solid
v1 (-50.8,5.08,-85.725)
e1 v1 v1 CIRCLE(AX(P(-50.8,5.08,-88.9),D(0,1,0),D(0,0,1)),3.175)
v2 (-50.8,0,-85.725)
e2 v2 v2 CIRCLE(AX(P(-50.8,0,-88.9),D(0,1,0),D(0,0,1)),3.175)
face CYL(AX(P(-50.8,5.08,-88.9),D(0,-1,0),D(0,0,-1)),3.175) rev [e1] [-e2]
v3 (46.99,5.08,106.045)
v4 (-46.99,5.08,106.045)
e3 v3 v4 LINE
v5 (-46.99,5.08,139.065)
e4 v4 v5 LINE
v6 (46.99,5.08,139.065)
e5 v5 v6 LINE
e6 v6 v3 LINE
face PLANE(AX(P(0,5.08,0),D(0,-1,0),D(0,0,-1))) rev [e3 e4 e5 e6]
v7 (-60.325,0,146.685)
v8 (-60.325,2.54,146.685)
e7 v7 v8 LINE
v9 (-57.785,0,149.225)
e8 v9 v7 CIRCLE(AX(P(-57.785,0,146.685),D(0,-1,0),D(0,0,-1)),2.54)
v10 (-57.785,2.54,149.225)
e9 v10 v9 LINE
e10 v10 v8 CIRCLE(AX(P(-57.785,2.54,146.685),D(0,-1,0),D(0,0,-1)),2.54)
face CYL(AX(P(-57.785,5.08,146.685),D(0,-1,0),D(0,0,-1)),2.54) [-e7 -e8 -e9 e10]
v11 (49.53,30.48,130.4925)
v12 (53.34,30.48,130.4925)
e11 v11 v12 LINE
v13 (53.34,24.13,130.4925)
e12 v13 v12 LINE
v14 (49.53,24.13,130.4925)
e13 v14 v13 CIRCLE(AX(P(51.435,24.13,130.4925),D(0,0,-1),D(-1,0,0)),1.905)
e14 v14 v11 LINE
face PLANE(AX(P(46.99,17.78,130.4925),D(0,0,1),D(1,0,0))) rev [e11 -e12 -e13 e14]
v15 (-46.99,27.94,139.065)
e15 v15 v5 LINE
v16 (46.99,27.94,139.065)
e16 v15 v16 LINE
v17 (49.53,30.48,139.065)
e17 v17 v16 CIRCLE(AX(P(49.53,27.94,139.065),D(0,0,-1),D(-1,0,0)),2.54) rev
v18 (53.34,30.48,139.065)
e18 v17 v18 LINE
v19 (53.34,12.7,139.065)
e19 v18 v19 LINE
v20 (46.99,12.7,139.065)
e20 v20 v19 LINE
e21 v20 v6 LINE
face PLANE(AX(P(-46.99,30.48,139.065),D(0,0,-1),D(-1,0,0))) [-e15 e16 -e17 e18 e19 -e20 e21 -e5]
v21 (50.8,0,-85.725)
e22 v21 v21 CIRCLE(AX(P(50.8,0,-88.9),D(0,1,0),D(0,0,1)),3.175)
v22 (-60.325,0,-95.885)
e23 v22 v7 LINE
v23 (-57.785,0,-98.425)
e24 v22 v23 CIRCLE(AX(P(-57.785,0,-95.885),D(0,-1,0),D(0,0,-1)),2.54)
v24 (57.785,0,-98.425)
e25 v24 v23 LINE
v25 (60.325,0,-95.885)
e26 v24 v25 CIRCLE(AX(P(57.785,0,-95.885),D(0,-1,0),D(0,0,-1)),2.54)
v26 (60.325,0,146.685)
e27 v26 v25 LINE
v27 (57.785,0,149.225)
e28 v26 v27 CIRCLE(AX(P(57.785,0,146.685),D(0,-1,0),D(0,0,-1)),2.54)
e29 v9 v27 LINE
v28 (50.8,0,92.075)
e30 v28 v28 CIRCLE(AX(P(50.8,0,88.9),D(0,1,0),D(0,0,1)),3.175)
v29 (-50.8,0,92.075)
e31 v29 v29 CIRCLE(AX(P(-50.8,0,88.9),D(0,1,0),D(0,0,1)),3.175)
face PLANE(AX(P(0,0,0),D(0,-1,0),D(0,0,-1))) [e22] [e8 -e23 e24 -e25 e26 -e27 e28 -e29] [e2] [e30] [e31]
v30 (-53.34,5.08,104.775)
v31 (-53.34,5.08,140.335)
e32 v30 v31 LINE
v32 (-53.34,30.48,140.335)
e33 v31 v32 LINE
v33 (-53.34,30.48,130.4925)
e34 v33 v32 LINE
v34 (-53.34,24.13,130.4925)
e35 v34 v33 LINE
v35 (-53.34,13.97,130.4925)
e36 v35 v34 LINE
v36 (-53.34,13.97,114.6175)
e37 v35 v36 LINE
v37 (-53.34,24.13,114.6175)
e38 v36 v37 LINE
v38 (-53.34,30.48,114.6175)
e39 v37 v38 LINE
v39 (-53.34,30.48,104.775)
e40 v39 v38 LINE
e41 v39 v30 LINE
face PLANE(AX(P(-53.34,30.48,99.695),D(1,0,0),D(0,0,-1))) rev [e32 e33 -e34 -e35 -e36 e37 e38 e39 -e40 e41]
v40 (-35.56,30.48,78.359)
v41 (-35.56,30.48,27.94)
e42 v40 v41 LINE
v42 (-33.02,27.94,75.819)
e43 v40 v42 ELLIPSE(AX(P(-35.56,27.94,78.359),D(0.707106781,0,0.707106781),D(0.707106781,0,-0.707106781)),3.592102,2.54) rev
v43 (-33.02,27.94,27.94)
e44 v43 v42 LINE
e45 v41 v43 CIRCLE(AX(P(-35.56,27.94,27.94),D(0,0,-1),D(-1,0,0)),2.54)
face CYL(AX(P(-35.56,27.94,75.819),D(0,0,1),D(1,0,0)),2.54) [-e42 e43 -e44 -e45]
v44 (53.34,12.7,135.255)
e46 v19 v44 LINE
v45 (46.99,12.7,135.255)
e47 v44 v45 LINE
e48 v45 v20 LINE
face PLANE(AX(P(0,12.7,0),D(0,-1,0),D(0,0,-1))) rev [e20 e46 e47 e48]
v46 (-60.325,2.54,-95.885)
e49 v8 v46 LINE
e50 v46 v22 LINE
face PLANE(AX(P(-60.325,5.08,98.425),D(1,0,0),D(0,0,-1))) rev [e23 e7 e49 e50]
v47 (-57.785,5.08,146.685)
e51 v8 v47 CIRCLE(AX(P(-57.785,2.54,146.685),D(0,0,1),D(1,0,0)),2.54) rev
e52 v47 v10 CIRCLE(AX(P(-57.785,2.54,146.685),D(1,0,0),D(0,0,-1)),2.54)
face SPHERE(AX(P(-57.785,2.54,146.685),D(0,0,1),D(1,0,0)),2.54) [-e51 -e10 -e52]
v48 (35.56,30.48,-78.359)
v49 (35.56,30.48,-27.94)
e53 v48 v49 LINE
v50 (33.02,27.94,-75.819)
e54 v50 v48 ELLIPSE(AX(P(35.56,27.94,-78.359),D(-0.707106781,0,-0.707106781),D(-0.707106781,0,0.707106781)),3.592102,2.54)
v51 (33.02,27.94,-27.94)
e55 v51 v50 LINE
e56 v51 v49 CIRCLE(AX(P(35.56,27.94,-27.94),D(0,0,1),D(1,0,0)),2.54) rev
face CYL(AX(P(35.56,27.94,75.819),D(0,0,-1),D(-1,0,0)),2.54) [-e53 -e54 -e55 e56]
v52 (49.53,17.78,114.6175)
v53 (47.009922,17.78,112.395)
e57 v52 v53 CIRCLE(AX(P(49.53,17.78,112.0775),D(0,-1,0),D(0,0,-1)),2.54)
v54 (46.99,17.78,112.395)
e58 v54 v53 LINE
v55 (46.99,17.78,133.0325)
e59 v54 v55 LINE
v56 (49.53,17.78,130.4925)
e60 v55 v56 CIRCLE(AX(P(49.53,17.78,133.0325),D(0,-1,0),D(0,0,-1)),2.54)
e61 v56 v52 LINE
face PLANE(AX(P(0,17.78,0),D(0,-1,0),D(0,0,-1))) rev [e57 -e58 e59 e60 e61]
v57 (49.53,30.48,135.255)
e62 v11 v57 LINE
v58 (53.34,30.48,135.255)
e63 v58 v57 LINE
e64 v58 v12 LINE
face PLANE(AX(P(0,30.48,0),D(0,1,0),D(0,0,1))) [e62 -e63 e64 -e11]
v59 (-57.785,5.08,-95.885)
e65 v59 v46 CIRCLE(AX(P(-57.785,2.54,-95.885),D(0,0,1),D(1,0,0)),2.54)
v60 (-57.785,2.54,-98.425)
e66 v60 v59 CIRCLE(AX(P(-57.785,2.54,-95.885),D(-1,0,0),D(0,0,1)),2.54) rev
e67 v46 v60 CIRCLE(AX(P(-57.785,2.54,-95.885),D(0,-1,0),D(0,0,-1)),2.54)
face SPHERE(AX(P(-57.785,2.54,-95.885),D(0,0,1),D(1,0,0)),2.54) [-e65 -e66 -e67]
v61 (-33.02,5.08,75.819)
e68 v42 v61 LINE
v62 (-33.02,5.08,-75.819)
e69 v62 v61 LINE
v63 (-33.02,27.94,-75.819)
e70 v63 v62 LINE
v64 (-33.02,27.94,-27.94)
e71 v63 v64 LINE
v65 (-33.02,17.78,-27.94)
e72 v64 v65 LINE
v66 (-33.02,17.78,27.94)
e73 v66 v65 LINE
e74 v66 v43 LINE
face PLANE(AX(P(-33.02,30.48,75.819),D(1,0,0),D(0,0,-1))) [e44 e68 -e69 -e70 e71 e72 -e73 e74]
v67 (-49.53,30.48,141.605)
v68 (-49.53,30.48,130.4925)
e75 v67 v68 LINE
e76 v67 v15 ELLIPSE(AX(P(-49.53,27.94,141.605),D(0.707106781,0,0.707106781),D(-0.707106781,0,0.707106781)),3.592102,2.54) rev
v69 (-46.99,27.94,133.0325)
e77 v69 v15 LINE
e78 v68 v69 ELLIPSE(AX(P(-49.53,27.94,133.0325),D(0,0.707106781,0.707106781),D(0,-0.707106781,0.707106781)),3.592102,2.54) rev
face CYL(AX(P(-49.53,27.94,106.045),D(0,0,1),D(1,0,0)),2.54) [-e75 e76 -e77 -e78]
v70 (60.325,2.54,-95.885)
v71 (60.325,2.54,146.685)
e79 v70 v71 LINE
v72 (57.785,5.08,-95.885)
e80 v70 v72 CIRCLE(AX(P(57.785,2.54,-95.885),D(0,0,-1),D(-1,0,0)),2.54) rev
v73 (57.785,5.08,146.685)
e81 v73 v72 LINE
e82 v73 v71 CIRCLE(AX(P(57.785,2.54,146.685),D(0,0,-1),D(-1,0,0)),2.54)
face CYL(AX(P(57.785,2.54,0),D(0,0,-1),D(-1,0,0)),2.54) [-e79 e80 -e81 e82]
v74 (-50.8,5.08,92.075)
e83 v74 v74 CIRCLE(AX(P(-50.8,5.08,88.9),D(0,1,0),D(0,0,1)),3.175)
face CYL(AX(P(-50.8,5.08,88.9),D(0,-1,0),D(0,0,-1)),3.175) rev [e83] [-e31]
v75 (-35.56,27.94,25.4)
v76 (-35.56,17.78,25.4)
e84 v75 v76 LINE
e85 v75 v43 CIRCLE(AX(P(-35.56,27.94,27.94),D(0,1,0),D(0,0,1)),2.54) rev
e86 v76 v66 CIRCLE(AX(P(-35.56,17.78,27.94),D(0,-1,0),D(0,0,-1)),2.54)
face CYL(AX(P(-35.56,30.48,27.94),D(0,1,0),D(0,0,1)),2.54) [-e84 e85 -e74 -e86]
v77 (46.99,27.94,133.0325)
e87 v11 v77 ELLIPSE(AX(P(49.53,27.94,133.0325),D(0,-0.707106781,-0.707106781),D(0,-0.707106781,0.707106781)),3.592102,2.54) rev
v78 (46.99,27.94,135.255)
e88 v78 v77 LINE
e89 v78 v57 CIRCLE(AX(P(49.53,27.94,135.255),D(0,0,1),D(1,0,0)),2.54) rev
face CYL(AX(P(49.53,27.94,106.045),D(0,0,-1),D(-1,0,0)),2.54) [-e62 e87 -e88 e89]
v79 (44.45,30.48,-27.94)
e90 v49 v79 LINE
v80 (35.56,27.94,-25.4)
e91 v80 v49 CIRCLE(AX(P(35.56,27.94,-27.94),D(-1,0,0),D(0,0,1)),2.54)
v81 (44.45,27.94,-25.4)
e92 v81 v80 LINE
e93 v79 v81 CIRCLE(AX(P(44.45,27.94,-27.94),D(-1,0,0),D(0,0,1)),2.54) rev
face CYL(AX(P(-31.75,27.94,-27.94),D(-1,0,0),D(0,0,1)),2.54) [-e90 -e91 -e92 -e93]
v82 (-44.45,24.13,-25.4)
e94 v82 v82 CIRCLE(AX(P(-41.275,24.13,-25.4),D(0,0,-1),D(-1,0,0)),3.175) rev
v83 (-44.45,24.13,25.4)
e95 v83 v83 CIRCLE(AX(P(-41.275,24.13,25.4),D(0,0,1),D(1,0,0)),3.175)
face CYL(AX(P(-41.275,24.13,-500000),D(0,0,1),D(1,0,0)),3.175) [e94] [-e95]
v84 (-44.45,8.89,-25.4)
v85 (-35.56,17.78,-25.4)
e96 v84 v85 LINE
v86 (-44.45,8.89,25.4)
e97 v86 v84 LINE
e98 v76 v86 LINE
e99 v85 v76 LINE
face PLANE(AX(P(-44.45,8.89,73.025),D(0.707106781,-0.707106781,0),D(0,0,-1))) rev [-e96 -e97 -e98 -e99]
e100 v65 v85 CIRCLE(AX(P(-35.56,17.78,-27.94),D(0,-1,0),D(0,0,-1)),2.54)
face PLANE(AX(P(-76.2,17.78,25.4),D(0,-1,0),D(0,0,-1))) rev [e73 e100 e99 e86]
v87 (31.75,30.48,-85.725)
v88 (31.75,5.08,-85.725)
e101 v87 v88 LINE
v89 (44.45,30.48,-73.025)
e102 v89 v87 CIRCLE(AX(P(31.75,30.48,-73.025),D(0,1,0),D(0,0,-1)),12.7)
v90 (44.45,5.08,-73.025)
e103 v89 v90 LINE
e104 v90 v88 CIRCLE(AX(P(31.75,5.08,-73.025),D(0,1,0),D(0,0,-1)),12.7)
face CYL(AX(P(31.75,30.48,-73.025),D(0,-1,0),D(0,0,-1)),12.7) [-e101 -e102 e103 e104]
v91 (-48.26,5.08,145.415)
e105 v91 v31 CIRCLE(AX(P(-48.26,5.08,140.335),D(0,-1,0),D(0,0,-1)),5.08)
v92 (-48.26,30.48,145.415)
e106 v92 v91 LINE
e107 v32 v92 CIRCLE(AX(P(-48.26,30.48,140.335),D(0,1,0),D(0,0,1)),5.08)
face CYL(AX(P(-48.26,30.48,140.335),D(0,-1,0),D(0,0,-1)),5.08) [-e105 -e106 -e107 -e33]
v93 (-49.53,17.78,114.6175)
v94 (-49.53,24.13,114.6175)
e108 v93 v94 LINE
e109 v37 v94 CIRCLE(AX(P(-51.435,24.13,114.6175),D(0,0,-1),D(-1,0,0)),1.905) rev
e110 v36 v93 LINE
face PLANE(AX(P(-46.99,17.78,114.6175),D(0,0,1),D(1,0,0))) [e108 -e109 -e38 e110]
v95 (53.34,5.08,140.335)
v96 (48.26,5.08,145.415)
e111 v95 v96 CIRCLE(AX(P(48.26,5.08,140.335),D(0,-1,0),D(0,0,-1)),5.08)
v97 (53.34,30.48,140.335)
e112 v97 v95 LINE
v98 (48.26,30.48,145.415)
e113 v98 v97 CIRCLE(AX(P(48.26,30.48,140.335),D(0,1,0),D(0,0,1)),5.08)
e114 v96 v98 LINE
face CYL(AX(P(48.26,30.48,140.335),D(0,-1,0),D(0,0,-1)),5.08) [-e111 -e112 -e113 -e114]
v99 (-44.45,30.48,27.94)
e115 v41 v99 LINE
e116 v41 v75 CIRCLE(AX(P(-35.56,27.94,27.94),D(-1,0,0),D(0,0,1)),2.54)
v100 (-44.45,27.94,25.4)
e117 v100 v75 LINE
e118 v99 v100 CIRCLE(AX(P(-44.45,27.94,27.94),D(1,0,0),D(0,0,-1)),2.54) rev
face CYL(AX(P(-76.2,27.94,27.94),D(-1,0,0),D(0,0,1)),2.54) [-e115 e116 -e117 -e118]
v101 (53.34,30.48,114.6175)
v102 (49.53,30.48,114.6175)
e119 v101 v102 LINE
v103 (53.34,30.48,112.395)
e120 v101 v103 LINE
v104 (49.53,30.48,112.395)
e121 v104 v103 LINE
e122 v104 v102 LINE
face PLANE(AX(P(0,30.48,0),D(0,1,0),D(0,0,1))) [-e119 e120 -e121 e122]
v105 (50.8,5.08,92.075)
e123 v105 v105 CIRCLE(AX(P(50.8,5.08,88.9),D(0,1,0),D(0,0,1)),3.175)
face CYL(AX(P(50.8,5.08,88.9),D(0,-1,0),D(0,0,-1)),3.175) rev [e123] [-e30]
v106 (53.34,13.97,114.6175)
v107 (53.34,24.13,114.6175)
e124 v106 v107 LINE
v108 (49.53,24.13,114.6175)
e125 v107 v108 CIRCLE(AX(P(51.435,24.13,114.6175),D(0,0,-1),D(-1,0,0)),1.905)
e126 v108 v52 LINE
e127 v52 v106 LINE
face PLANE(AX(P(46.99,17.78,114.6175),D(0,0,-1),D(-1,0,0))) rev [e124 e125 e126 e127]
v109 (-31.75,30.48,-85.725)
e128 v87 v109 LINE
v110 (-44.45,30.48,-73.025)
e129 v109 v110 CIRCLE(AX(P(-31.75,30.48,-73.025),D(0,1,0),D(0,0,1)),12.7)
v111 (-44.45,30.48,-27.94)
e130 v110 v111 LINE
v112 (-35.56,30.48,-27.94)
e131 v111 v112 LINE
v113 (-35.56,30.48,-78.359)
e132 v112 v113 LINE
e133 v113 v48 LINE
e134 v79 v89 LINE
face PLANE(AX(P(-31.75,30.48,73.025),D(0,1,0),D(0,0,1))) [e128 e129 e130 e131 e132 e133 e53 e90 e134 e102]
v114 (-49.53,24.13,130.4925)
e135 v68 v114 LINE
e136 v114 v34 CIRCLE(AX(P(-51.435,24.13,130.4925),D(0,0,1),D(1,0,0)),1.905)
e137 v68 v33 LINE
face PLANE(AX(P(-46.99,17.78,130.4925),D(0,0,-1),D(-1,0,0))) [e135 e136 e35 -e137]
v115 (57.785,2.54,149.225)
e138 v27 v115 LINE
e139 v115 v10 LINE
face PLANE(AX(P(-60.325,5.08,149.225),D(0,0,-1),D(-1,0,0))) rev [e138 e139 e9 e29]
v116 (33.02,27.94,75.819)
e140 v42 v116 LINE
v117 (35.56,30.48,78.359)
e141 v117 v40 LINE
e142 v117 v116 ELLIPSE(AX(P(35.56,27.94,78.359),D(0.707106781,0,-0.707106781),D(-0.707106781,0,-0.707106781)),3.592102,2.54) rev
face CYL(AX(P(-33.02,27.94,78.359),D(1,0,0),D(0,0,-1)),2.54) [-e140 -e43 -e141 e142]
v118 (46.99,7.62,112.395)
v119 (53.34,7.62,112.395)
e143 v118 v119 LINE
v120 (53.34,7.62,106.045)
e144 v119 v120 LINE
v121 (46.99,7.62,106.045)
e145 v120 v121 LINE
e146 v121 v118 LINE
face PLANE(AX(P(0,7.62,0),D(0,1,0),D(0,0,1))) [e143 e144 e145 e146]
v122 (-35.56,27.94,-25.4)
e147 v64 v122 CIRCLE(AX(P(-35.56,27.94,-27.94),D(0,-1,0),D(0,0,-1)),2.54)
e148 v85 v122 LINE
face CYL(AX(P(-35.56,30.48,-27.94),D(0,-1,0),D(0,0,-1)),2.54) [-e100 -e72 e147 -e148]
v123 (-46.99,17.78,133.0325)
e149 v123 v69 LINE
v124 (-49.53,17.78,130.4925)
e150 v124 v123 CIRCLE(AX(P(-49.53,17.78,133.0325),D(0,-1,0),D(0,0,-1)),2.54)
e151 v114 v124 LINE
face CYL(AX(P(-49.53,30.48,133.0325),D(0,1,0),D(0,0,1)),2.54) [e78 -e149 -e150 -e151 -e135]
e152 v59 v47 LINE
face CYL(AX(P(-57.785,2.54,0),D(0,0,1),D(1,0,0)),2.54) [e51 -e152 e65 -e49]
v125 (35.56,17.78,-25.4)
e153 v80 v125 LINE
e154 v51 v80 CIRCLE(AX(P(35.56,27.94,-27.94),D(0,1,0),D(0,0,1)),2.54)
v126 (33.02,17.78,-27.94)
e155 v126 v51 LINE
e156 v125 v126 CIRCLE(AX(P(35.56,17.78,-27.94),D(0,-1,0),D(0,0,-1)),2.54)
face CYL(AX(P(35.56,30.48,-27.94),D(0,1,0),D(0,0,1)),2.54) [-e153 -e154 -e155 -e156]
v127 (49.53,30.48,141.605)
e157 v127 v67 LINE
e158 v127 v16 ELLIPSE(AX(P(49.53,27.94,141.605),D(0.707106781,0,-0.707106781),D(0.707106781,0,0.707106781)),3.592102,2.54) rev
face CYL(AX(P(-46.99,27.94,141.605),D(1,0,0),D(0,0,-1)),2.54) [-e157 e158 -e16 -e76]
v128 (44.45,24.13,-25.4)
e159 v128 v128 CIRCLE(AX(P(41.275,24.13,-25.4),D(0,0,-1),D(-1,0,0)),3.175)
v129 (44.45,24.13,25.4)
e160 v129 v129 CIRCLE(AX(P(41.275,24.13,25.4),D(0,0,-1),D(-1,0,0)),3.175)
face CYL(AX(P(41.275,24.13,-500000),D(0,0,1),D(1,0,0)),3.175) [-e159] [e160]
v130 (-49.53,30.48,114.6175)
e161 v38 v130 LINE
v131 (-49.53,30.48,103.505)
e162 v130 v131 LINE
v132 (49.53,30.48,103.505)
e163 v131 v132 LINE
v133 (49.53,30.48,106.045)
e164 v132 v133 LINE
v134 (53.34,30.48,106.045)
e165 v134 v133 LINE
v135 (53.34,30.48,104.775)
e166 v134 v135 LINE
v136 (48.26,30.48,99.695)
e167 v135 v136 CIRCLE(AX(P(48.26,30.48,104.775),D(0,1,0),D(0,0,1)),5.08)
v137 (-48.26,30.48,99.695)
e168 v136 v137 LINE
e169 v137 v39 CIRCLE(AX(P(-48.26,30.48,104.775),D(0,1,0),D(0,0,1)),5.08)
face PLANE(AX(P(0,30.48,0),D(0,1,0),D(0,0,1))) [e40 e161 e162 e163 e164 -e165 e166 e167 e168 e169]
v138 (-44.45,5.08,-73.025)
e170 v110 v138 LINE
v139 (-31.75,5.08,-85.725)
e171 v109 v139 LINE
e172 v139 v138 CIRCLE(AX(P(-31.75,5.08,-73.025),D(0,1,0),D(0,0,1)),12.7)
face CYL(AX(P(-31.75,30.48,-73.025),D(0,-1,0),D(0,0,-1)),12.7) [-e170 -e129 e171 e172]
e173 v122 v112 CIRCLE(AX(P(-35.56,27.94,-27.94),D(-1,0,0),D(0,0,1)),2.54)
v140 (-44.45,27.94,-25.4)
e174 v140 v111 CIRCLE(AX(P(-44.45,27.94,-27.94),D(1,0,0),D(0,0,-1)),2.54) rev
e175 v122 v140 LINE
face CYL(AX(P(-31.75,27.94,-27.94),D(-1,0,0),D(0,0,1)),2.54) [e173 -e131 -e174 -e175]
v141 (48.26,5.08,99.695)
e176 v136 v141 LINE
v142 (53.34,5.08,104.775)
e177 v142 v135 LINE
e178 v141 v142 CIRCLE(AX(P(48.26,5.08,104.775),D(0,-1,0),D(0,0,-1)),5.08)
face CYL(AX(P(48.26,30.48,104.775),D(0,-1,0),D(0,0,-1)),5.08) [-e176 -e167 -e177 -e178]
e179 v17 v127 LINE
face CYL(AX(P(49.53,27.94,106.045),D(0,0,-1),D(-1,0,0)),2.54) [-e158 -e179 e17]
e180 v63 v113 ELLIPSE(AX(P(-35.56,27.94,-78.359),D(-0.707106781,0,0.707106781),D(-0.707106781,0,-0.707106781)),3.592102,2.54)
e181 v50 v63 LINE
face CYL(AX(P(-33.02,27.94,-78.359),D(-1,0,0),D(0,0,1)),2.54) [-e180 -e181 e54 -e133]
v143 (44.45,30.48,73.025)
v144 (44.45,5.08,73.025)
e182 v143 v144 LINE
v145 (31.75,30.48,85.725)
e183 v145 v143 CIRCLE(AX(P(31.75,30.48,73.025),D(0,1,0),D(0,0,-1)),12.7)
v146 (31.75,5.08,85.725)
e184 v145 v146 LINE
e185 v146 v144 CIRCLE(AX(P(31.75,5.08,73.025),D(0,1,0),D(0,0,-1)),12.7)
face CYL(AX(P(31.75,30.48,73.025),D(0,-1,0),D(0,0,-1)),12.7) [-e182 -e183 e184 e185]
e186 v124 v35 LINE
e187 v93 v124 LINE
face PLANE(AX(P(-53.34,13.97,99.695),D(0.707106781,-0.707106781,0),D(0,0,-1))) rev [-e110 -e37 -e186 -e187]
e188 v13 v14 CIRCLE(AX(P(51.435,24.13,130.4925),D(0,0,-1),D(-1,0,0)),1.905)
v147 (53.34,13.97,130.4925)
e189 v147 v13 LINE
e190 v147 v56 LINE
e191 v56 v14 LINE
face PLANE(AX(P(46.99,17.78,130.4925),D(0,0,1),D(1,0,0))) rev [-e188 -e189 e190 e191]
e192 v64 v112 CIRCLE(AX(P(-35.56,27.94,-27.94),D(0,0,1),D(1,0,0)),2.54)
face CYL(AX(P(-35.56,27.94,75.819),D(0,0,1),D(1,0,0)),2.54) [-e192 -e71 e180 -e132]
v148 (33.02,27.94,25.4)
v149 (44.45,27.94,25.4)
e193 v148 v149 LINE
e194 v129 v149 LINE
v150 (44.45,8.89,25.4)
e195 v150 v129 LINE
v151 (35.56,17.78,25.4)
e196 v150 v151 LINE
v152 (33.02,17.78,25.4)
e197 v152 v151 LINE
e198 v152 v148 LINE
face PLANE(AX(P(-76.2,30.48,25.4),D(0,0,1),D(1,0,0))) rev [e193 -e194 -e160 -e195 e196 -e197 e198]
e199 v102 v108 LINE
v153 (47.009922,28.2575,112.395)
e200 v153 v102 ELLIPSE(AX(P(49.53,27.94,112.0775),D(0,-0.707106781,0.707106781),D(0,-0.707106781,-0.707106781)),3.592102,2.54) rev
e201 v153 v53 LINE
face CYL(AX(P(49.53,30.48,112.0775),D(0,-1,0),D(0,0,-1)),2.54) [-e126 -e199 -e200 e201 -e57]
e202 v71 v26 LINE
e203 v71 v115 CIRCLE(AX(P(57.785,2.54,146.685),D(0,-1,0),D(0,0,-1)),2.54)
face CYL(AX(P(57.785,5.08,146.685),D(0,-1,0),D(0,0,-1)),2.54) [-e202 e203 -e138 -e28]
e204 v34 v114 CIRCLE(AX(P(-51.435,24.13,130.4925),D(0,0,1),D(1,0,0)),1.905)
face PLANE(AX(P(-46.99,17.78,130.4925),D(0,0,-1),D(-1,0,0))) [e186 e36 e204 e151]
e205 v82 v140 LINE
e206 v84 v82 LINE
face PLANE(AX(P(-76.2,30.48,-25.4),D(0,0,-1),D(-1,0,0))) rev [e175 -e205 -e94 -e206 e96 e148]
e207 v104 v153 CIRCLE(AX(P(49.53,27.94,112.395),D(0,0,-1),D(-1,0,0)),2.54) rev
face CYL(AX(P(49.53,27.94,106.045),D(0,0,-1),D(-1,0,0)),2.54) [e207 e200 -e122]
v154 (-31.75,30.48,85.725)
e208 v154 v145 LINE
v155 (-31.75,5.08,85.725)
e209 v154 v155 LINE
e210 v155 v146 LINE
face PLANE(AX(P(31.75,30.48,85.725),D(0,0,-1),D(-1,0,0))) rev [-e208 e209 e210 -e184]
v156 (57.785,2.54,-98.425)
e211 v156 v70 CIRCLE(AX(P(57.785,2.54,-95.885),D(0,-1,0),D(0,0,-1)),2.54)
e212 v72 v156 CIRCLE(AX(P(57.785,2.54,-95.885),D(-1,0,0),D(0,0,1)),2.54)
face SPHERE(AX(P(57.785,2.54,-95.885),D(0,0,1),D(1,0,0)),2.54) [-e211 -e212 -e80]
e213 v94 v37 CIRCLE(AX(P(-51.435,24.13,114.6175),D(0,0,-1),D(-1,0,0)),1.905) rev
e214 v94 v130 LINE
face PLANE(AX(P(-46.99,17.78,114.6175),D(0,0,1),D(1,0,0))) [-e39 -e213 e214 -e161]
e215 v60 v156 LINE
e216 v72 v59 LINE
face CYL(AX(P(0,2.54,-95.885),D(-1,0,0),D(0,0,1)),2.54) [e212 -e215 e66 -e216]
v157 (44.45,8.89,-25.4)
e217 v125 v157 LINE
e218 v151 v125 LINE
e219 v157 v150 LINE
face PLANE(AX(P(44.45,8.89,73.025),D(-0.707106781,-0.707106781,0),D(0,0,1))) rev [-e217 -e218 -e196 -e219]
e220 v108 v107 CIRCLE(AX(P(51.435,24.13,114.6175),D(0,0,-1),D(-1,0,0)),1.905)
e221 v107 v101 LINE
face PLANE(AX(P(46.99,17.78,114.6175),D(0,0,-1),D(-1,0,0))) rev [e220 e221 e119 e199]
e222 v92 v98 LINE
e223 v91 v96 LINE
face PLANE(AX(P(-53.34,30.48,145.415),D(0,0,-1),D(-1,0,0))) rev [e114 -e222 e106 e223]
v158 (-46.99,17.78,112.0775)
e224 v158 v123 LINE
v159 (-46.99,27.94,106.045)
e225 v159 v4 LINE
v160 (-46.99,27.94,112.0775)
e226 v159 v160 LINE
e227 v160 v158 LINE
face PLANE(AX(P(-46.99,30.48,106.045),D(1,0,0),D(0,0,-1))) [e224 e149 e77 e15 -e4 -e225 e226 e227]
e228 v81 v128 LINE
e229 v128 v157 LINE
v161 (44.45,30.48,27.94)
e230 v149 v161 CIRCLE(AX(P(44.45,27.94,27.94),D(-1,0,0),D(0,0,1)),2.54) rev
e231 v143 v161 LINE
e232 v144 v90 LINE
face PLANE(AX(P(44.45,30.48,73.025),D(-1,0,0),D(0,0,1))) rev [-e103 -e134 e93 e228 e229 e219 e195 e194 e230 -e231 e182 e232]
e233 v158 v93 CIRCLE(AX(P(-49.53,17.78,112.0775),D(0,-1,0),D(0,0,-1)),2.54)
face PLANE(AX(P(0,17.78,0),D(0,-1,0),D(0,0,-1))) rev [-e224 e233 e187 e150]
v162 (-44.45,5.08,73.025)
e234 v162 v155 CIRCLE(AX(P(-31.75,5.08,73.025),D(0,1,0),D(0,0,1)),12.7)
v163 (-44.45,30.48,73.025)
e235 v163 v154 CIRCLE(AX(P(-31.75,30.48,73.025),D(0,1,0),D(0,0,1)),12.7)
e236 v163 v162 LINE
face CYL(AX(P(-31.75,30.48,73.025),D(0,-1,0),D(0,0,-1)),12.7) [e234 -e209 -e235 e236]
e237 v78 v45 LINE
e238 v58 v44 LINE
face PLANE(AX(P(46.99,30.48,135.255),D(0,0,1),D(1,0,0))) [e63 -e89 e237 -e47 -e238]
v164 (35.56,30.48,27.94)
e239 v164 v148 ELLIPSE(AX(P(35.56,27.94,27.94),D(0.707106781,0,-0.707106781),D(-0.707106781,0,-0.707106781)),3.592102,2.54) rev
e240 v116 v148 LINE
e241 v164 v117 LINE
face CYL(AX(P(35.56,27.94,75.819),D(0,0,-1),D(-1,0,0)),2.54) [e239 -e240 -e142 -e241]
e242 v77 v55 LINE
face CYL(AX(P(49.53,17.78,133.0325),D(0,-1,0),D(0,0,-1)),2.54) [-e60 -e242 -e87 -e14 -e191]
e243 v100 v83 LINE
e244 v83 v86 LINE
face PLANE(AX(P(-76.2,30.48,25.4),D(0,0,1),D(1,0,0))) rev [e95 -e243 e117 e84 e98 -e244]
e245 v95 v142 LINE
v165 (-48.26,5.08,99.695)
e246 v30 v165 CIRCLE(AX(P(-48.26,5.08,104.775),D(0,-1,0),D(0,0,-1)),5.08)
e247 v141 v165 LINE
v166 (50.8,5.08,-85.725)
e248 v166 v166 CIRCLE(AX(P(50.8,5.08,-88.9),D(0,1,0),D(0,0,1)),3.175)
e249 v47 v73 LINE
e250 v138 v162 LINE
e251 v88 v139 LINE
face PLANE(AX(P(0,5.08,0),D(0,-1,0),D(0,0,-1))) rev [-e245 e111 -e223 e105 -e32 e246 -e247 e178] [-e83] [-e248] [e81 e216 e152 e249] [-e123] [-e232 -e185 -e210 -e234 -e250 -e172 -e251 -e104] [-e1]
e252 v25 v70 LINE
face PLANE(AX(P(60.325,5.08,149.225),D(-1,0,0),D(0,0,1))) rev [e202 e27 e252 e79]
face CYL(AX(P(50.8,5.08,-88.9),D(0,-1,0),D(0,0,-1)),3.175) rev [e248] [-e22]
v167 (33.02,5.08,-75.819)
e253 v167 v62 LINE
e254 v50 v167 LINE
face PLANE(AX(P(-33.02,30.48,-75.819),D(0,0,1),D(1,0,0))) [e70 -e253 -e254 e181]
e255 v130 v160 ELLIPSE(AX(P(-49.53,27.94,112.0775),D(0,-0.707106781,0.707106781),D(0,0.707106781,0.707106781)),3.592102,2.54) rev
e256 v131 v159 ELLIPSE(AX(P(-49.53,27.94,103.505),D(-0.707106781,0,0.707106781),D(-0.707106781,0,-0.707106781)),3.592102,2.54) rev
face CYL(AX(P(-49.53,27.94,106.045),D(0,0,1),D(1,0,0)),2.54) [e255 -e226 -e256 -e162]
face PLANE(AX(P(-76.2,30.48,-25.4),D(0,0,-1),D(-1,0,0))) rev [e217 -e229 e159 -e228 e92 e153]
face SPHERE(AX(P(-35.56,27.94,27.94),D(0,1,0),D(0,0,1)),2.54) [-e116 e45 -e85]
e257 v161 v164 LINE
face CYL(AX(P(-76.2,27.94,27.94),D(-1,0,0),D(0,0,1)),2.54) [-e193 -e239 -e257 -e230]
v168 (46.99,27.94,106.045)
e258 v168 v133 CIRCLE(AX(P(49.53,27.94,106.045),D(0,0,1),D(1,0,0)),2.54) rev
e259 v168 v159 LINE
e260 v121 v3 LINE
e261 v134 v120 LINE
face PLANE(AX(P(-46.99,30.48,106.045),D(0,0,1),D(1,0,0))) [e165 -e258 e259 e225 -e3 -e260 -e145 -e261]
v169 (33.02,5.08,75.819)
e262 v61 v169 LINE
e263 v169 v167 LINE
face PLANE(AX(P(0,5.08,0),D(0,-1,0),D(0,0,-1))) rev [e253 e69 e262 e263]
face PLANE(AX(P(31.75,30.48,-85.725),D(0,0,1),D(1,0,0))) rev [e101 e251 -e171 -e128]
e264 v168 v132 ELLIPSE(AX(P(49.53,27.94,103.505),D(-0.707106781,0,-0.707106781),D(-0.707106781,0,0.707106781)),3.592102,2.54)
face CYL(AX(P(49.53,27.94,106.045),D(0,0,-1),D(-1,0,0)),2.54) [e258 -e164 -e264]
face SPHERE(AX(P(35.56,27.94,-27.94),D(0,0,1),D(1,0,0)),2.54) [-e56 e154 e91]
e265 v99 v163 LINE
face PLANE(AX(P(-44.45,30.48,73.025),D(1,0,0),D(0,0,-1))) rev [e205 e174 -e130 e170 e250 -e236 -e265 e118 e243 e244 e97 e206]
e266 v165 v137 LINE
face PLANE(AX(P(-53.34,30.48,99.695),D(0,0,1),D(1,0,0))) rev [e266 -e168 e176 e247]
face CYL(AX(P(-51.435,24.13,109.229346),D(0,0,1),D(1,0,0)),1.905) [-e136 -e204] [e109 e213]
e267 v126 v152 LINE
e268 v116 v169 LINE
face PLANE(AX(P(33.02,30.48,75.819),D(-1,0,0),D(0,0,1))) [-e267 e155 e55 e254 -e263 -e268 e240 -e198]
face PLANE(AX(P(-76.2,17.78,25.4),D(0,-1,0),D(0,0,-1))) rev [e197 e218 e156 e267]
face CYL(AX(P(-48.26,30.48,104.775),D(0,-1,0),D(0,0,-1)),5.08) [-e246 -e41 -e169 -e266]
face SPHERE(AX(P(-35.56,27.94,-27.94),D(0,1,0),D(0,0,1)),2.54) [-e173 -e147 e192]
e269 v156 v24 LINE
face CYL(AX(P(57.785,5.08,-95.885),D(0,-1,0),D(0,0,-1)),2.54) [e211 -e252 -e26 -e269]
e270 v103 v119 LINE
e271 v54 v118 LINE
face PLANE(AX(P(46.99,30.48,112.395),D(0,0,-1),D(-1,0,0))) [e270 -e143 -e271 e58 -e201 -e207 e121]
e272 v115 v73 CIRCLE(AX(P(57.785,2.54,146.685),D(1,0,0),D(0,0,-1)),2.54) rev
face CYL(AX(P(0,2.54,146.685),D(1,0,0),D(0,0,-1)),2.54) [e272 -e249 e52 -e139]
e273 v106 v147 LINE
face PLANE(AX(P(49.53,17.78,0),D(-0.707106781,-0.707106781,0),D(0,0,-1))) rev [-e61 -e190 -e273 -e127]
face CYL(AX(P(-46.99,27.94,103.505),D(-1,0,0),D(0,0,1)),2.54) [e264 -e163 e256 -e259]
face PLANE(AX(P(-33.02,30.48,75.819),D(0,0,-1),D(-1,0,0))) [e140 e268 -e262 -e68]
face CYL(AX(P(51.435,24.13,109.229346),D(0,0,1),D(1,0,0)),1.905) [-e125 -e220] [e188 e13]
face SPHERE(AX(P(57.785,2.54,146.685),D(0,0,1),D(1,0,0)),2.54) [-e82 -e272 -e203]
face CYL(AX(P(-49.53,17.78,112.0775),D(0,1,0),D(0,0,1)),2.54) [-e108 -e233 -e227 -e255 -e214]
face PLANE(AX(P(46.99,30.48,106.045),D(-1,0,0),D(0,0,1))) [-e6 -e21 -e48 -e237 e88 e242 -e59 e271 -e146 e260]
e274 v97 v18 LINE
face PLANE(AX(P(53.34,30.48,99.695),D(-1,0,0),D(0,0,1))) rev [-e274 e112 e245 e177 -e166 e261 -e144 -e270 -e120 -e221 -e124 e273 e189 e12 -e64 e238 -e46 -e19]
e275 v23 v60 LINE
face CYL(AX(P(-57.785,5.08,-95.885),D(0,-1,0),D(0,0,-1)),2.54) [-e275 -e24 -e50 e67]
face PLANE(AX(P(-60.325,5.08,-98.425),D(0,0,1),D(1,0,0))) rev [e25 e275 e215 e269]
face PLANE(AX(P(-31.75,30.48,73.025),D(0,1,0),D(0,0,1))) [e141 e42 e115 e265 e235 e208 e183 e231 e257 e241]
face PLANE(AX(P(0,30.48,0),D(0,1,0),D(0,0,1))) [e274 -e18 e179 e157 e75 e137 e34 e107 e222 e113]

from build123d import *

# Parameters (mm, degrees)
SKETCH1_R           = 3.175
BOSS_EXTRUDE1_DEPTH = 5.08
SKETCH2_W           = 66.04
SKETCH2_H           = 151.638
BOSS_EXTRUDE2_DEPTH = 25.4
SKETCH3_W           = 50.8
SKETCH3_H           = 12.7
CUT_EXTRUDE1_DEPTH  = 76.2
BOSS_EXTRUDE3_REACH = 143.07
SKETCH4_R           = 3.175
SKETCH6_W           = 106.68
SKETCH6_H           = 45.72
SKETCH6_W_2         = 93.98
SKETCH6_H_2         = 33.02
BOSS_EXTRUDE4_DEPTH = 25.4
SKETCH8_W           = 6.35
SKETCH8_H           = 15.875
CUT_EXTRUDE2_DEPTH  = 12.7
SKETCH10_R          = 1.905
BOSS_EXTRUDE5_DEPTH = 15.875
FILLET6_R           = 2.54
FILLET7_R           = 2.54
FILLET8_R           = 2.54
FILLET9_R           = 5.08
CHAMFER2_SIZE       = 8.89
FILLET10_R          = 2.54
FILLET5_R           = 2.54
CHAMFER3_SIZE       = 8.89
CHAMFER5_SIZE       = 3.81
CHAMFER6_SIZE       = 3.81
CUT_EXTRUDE3_START  = 2.54
SKETCH12_W          = 6.35
SKETCH12_H          = 6.35
CUT_EXTRUDE3_DEPTH  = 161.408968239
CUT_EXTRUDE4_START  = 7.62
SKETCH13_W          = 6.35
SKETCH13_H          = 3.81
CUT_EXTRUDE4_DEPTH  = 156.328968239


# Some blends are built 0.0001 mm under size
with BuildPart() as part:
    # Sketch1 → Boss-Extrude1 (new body)
    with BuildSketch(Plane(origin=(0, 0, 0), x_dir=(1, 0, 0), z_dir=(0, 1, 0))):
        Polygon((-60.325, -98.425), (-60.325, -149.225), (60.325, -149.225), (60.325, -98.425), (60.325, 98.425), (-60.325, 98.425), align=None)
        with Locations(Location((-50.8, 88.9, 0), (0, 0, 270))):
            Circle(SKETCH1_R, mode=Mode.SUBTRACT)
        with Locations(Location((50.8, 88.9, 0), (0, 0, 270))):
            Circle(SKETCH1_R, mode=Mode.SUBTRACT)
        with Locations(Location((50.8, -88.9, 0), (0, 0, 270))):
            Circle(SKETCH1_R, mode=Mode.SUBTRACT)
        with Locations(Location((-50.8, -88.9, 0), (0, 0, 270))):
            Circle(SKETCH1_R, mode=Mode.SUBTRACT)
    extrude(amount=BOSS_EXTRUDE1_DEPTH)

    # Sketch2 → Boss-Extrude2 (add)
    with BuildSketch(Plane(origin=(0, 5.08, 0), x_dir=(1, 0, 0), z_dir=(0, 1, 0))):
        with BuildLine():
            Line((31.75, -85.725), (-31.75, -85.725))
            ThreePointArc((-31.75, -85.725), (-40.730256121, -82.005256121), (-44.45, -73.025))
            Line((-44.45, -73.025), (-44.45, 73.025))
            ThreePointArc((-44.45, 73.025), (-40.730256121, 82.005256121), (-31.75, 85.725))
            Line((-31.75, 85.725), (31.75, 85.725))
            ThreePointArc((31.75, 85.725), (40.730256121, 82.005256121), (44.45, 73.025))
            Line((44.45, 73.025), (44.45, -73.025))
            ThreePointArc((44.45, -73.025), (40.730256121, -82.005256121), (31.75, -85.725))
        make_face()
        Rectangle(SKETCH2_W, SKETCH2_H, mode=Mode.SUBTRACT)
    extrude(amount=BOSS_EXTRUDE2_DEPTH)

    # Sketch3 → Cut-Extrude1 (cut, symmetric)
    with BuildSketch(Plane(origin=(0, 0, 0), x_dir=(0, 0, -1), z_dir=(1, 0, 0))):
        with Locations((0, 24.13)):
            Rectangle(SKETCH3_W, SKETCH3_H)
    extrude(amount=CUT_EXTRUDE1_DEPTH, both=True, mode=Mode.SUBTRACT)

    # Sketch4 → Boss-Extrude3 (add, up to next)
    with BuildSketch(Plane(origin=(0, 0, 25.4), x_dir=(-1, 0, 0), z_dir=(0, 0, -1)), mode=Mode.PRIVATE) as boss_extrude3_sk1:
        with Locations(Location((-41.275, 24.13, 0), (0, 0, 180))):
            Circle(SKETCH4_R)
    boss_extrude3_tool1 = extrude(boss_extrude3_sk1.sketch, amount=BOSS_EXTRUDE3_REACH, mode=Mode.PRIVATE) - part.part
    boss_extrude3 = boss_extrude3_tool1.solids().sort_by_distance((41.275, 24.13, 25.4))[0]
    add(boss_extrude3)

    # Mirror1: Boss-Extrude3 across plane
    add(boss_extrude3.mirror(Plane(origin=(0, 0, 0), x_dir=(0, 0, 1), z_dir=(1, 0, 0))))

    # Sketch6 → Boss-Extrude4 (add)
    with BuildSketch(Plane(origin=(0, 5.08, 0), x_dir=(1, 0, 0), z_dir=(0, 1, 0))):
        with Locations((0, -122.555)):
            Rectangle(SKETCH6_W, SKETCH6_H)
        with Locations((0, -122.555)):
            Rectangle(SKETCH6_W_2, SKETCH6_H_2, mode=Mode.SUBTRACT)
    extrude(amount=BOSS_EXTRUDE4_DEPTH)

    # Sketch8 → Cut-Extrude2 (cut)
    with BuildSketch(Plane(origin=(0, 30.48, 0), x_dir=(1, 0, 0), z_dir=(0, 1, 0))):
        with Locations((50.165, -122.555)):
            Rectangle(SKETCH8_W, SKETCH8_H)
    cut_extrude2 = extrude(amount=-CUT_EXTRUDE2_DEPTH, mode=Mode.SUBTRACT)

    # Sketch10 → Boss-Extrude5 (add)
    with BuildSketch(Plane(origin=(0, 0, 130.4925), x_dir=(-1, 0, 0), z_dir=(0, 0, -1))):
        with Locations(Location((-51.435, 24.13, 0), (0, 0, 180))):
            Circle(SKETCH10_R)
    boss_extrude5 = extrude(amount=BOSS_EXTRUDE5_DEPTH)

    # Mirror2: Cut-Extrude2, Boss-Extrude5 across plane
    add(cut_extrude2.mirror(Plane(origin=(0, 0, 0), x_dir=(0, 0, 1), z_dir=(1, 0, 0))), mode=Mode.SUBTRACT)
    add(boss_extrude5.mirror(Plane(origin=(0, 0, 0), x_dir=(0, 0, 1), z_dir=(1, 0, 0))))

    # Fillet6
    fillet6_edges = [part.edges().sort_by_distance(p)[0] for p in [
        (-46.99, 30.48, 110.33125),
        (0, 30.48, 139.065),
        (46.99, 30.48, 134.77875),
        (0, 30.48, 106.045),
        (46.99, 30.48, 110.33125),
        (46.99, 24.13, 130.4925),
        (46.99, 24.13, 114.6175),
        (-46.99, 30.48, 134.77875),
        (-46.99, 24.13, 114.6175),
        (-46.99, 24.13, 130.4925),
    ]]
    fillet(fillet6_edges, radius=FILLET6_R - 0.0001)  # a hair under: the kernel refuses the full size

    # Fillet7
    fillet7_edges = [part.edges().sort_by_distance(p)[0] for p in [
        (-60.325, 5.08, 25.4),
        (0, 5.08, 149.225),
        (60.325, 5.08, 25.4),
        (0, 5.08, -98.425),
    ]]
    fillet(fillet7_edges, radius=FILLET7_R)

    # Fillet8
    # the kernel refuses this fillet: 2.54 mm, written as the material it takes off along each edge
    with BuildSketch(Plane(origin=(-57.785, 2.54, 146.685), x_dir=(0, 0, 1), z_dir=(-1, 0, 0))) as fillet8_piece_1_section:
        Polygon((0, 0), (FILLET8_R, 0), (FILLET8_R, FILLET8_R), (0, FILLET8_R), align=None)
    fillet8_piece_1 = extrude(amount=FILLET8_R, mode=Mode.PRIVATE)
    fillet8_piece_1 = fillet8_piece_1 - Plane(origin=(-57.785, 2.54, 146.685), x_dir=(0, -0.7071067811865475, -0.7071067811865475), z_dir=(-1, 0, 0)) * Sphere(FILLET8_R, mode=Mode.PRIVATE)
    add(fillet8_piece_1, mode=Mode.SUBTRACT)
    with BuildSketch(Plane(origin=(-57.785, 2.54, -95.885), x_dir=(0, 0, -1), z_dir=(-1, 0, 0))) as fillet8_piece_2_section:
        Polygon((0, 0), (FILLET8_R, 0), (FILLET8_R, -FILLET8_R), (0, -FILLET8_R), align=None)
    fillet8_piece_2 = extrude(amount=FILLET8_R, mode=Mode.PRIVATE)
    fillet8_piece_2 = fillet8_piece_2 - Plane(origin=(-57.785, 2.54, -95.885), x_dir=(0, -0.7071067811865475, 0.7071067811865475), z_dir=(-1, 0, 0)) * Sphere(FILLET8_R, mode=Mode.PRIVATE)
    add(fillet8_piece_2, mode=Mode.SUBTRACT)
    with BuildSketch(Plane(origin=(57.785, 2.54, 146.685), x_dir=(1, 0, 0), z_dir=(0, 0, 1))) as fillet8_piece_3_section:
        Polygon((0, 0), (FILLET8_R, 0), (FILLET8_R, FILLET8_R), (0, FILLET8_R), align=None)
    fillet8_piece_3 = extrude(amount=FILLET8_R, mode=Mode.PRIVATE)
    fillet8_piece_3 = fillet8_piece_3 - Plane(origin=(57.785, 2.54, 146.685), x_dir=(-0.7071067811865475, -0.7071067811865475, 0), z_dir=(0, 0, 1)) * Sphere(FILLET8_R, mode=Mode.PRIVATE)
    add(fillet8_piece_3, mode=Mode.SUBTRACT)
    with BuildSketch(Plane(origin=(57.785, 2.54, -95.885), x_dir=(1, 0, 0), z_dir=(0, 0, -1))) as fillet8_piece_4_section:
        Polygon((0, 0), (FILLET8_R, 0), (FILLET8_R, -FILLET8_R), (0, -FILLET8_R), align=None)
    fillet8_piece_4 = extrude(amount=FILLET8_R, mode=Mode.PRIVATE)
    fillet8_piece_4 = fillet8_piece_4 - Plane(origin=(57.785, 2.54, -95.885), x_dir=(-0.7071067811865475, -0.7071067811865475, 0), z_dir=(0, 0, -1)) * Sphere(FILLET8_R, mode=Mode.PRIVATE)
    add(fillet8_piece_4, mode=Mode.SUBTRACT)
    with BuildSketch(Plane(origin=(60.325, -6.35, -98.425), x_dir=(-1, 0, 0), z_dir=(0, 1, 0)), Plane(origin=(-60.325, -6.35, -98.425), x_dir=(0, 0, 1), z_dir=(0, 1, 0))) as fillet8_piece_5:
        with BuildLine():
            CenterArc((FILLET8_R, FILLET8_R), FILLET8_R, 180, 90)
            Line((0, FILLET8_R), (0, 0))
            Line((0, 0), (FILLET8_R, 0))
        make_face()
    extrude(amount=8.89, mode=Mode.SUBTRACT)
    with BuildSketch(Plane(origin=(60.325, -6.35, 149.225), x_dir=(-1, 0, 0), z_dir=(0, 1, 0)), Plane(origin=(-60.325, -6.35, 149.225), x_dir=(0, 0, -1), z_dir=(0, 1, 0))) as fillet8_piece_6:
        with BuildLine():
            CenterArc((FILLET8_R, -FILLET8_R), FILLET8_R, 90, 90)
            Line((0, -FILLET8_R), (0, 0))
            Line((0, 0), (FILLET8_R, 0))
        make_face()
    extrude(amount=8.89, mode=Mode.SUBTRACT)

    # Fillet9
    fillet9_edges = [part.edges().sort_by_distance(p)[0] for p in [
        (53.34, 17.78, 145.415),
        (53.34, 17.78, 99.695),
        (-53.34, 17.78, 99.695),
        (-53.34, 17.78, 145.415),
    ]]
    fillet(fillet9_edges, radius=FILLET9_R)

    # Chamfer2
    chamfer2_edges = [part.edges().sort_by_distance(p)[0] for p in [
        (-44.45, 17.78, 0),
    ]]
    chamfer(chamfer2_edges, length=CHAMFER2_SIZE)

    # Fillet10
    fillet10_edges = [part.edges().sort_by_distance(p)[0] for p in [
        (-33.02, 24.13, 25.4),
        (-33.02, 24.13, -25.4),
    ]]
    fillet(fillet10_edges, radius=FILLET10_R)

    # Fillet5
    fillet5_edges = [part.edges().sort_by_distance(p)[0] for p in [
        (-33.02, 30.48, 51.8795),
        (-33.763948776, 30.48, 26.143948776),
        (-33.763948776, 30.48, -26.143948776),
        (33.02, 30.48, 50.6095),
        (0, 30.48, -75.819),
        (-33.02, 30.48, -51.8795),
        (0, 30.48, 75.819),
        (33.02, 30.48, -50.6095),
        (38.735, 30.48, 25.4),
        (-40.005, 30.48, 25.4),
        (38.735, 30.48, -25.4),
        (-40.005, 30.48, -25.4),
        (33.02, 24.13, -25.4),
    ]]
    fillet(fillet5_edges, radius=FILLET5_R)

    # Chamfer3
    chamfer3_edges = [part.edges().sort_by_distance(p)[0] for p in [
        (44.45, 17.78, 0),
    ]]
    chamfer(chamfer3_edges, length=CHAMFER3_SIZE)

    # Chamfer5
    chamfer5_edges = [part.edges().sort_by_distance(p)[0] for p in [
        (53.34, 17.78, 122.555),
    ]]
    chamfer(chamfer5_edges, length=CHAMFER5_SIZE)

    # Chamfer6
    chamfer6_edges = [part.edges().sort_by_distance(p)[0] for p in [
        (-53.34, 17.78, 122.555),
    ]]
    chamfer(chamfer6_edges, length=CHAMFER6_SIZE)

    # Sketch12 → Cut-Extrude3 (cut, through all)
    with BuildSketch(Plane(origin=(0, 5.08, 0), x_dir=(1, 0, 0), z_dir=(0, 1, 0)).offset(CUT_EXTRUDE3_START)):
        with Locations((50.165, -109.22)):
            Rectangle(SKETCH12_W, SKETCH12_H)
    extrude(amount=CUT_EXTRUDE3_DEPTH, mode=Mode.SUBTRACT)

    # Sketch13 → Cut-Extrude4 (cut, through all)
    with BuildSketch(Plane(origin=(0, 5.08, 0), x_dir=(1, 0, 0), z_dir=(0, 1, 0)).offset(CUT_EXTRUDE4_START)):
        with Locations((50.165, -137.16)):
            Rectangle(SKETCH13_W, SKETCH13_H)
    extrude(amount=CUT_EXTRUDE4_DEPTH, mode=Mode.SUBTRACT)


solid = part.part
